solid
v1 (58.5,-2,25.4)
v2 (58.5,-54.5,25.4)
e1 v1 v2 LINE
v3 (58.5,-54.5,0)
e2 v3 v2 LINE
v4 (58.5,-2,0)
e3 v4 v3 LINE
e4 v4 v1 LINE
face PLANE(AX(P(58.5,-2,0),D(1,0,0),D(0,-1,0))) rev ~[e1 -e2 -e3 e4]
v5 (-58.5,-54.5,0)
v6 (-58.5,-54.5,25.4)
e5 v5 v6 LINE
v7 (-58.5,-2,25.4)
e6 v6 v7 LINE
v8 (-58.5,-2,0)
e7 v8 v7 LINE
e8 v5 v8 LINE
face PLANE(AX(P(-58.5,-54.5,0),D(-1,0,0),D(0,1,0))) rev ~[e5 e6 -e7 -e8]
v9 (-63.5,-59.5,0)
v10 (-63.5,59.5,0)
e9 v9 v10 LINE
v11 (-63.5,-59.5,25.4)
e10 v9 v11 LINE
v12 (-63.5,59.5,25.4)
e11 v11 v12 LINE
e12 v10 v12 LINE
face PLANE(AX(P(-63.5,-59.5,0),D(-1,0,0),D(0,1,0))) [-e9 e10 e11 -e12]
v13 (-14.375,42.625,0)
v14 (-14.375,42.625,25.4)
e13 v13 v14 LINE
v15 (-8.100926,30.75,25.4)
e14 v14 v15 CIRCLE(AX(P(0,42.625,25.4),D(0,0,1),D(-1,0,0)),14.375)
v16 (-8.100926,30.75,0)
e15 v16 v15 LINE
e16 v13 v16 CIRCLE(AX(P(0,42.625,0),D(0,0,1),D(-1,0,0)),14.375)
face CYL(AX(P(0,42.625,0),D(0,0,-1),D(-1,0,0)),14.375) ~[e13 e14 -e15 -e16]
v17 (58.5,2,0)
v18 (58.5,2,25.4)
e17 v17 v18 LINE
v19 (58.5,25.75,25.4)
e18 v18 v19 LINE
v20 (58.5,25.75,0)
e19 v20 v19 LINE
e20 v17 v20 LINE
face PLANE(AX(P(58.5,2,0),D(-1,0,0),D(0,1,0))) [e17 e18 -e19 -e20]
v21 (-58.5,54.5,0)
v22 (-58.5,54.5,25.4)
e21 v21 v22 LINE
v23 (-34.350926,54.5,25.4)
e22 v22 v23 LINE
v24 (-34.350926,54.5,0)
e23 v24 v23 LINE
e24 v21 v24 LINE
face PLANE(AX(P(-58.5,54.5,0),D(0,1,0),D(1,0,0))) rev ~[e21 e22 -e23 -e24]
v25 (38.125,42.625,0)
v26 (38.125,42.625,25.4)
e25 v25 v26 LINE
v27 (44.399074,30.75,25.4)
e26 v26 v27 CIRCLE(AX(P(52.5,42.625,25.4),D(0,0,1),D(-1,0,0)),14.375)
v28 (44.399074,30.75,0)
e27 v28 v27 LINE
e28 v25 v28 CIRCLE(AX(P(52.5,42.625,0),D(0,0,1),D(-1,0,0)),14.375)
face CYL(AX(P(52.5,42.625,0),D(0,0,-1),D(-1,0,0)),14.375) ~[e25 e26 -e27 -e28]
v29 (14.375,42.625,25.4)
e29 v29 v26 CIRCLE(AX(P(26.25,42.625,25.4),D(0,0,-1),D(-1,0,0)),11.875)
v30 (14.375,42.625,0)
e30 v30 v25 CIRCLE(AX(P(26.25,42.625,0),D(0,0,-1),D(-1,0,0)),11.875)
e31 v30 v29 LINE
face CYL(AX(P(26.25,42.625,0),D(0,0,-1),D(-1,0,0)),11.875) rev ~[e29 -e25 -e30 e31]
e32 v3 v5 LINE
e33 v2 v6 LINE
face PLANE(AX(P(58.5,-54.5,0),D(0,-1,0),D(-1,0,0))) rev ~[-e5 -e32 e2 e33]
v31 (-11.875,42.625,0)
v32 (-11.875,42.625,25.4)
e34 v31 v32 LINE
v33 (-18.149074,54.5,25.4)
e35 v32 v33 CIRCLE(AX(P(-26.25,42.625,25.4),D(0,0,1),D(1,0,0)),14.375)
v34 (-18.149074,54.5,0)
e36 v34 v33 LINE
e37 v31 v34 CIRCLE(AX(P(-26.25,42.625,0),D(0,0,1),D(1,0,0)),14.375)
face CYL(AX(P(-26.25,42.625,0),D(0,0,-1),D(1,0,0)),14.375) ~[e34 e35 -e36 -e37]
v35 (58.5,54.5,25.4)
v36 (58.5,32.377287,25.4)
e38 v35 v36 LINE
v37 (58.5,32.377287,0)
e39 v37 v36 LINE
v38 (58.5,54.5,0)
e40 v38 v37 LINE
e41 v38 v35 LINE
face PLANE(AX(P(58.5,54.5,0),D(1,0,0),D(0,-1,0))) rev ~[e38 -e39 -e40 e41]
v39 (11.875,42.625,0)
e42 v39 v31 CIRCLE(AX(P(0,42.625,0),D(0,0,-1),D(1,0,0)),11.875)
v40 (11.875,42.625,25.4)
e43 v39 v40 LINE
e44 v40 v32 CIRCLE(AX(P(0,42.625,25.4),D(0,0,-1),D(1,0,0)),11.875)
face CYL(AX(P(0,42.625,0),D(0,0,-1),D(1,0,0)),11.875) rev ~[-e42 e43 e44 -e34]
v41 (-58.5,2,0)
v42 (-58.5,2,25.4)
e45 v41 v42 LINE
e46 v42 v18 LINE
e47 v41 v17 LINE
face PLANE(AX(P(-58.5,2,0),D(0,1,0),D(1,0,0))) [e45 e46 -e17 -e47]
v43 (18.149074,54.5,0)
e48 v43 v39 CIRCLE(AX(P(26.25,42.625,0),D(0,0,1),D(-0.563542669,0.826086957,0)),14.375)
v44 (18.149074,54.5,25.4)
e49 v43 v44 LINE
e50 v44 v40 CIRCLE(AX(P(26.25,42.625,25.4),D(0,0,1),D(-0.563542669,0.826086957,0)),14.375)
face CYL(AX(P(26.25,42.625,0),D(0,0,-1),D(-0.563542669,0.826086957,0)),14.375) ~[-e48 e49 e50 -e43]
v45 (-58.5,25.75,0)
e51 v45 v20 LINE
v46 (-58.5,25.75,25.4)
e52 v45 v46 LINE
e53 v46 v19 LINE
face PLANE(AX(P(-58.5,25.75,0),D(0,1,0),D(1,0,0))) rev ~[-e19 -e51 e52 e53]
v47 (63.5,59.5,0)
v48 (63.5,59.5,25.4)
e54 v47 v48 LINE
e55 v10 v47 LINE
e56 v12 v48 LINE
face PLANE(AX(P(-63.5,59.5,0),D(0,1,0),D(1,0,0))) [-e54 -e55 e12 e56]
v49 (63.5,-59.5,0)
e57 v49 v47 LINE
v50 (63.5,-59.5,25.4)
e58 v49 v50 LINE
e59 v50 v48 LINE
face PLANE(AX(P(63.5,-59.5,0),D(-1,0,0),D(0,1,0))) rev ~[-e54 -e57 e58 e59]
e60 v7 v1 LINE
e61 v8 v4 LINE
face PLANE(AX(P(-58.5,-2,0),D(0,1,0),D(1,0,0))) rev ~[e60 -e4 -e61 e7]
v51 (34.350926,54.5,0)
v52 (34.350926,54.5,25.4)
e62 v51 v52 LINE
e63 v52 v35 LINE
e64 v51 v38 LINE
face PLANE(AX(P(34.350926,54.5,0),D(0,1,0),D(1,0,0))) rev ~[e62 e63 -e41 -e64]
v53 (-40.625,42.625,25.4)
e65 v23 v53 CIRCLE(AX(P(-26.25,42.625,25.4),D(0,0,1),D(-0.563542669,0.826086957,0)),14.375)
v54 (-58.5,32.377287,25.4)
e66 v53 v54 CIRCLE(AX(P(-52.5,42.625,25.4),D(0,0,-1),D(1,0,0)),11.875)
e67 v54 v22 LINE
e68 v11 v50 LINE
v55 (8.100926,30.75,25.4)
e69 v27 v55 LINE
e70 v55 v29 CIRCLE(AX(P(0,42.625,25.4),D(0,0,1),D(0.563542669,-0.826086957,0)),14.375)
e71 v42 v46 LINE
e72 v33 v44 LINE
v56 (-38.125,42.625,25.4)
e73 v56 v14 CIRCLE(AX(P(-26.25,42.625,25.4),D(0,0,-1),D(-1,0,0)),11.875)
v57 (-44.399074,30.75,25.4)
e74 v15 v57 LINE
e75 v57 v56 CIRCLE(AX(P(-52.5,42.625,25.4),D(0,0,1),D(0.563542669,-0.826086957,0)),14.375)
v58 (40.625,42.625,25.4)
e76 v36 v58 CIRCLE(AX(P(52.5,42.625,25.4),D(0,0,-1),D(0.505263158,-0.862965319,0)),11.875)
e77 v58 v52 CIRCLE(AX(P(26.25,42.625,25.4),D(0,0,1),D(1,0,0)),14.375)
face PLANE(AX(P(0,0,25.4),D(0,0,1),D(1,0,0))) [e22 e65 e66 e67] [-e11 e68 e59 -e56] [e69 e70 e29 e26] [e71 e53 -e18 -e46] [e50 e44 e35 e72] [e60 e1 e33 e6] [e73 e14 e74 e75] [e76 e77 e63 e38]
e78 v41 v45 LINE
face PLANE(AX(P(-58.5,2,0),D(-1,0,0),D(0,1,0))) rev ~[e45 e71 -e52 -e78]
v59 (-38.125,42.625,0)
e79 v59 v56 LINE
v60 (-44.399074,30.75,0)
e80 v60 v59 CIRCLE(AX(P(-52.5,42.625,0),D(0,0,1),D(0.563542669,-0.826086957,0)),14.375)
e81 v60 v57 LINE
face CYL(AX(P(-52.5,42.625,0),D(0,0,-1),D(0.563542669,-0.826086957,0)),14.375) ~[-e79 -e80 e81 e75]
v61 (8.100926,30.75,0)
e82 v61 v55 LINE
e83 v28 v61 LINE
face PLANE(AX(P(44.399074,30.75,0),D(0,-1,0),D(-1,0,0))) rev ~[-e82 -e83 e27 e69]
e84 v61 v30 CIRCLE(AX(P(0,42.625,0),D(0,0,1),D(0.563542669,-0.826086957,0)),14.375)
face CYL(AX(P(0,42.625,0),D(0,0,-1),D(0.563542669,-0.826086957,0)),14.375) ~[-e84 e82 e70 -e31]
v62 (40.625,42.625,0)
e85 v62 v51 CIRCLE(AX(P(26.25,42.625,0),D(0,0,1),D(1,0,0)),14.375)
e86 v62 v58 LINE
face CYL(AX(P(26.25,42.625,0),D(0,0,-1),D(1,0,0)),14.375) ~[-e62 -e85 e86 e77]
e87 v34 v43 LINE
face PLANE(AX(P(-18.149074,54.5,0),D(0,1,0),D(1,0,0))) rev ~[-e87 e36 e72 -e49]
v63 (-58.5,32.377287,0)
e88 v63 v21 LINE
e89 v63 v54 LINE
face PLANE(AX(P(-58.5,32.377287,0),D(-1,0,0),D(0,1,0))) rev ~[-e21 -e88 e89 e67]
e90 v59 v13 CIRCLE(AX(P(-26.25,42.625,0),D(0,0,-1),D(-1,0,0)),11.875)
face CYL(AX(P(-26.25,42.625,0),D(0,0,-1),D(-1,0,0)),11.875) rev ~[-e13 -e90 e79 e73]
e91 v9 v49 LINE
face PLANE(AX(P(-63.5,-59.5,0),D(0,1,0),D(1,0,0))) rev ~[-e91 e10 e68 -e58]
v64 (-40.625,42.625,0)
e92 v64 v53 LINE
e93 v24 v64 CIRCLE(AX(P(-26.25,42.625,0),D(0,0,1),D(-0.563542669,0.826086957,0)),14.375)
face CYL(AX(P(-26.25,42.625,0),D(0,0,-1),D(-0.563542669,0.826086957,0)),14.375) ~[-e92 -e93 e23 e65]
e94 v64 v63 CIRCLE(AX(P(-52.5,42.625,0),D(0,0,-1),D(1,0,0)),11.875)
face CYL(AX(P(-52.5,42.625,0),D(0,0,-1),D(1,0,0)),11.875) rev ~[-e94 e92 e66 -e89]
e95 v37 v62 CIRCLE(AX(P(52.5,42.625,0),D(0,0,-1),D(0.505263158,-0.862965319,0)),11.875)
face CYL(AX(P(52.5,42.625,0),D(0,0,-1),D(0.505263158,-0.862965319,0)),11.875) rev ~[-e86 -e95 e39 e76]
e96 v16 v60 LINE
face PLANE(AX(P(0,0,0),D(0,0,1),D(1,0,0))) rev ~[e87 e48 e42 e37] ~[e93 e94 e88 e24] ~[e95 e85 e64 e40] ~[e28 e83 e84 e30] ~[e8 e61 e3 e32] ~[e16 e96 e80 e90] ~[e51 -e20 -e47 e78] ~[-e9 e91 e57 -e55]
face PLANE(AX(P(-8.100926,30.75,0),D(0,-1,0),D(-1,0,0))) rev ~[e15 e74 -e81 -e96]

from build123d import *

# Parameters (mm, degrees)
F0_W     = 127
F0_H     = 119
F0_W_2   = 117
F0_H_2   = 23.75
F1_DEPTH = 25.4


# Not quite as in the source:
# - a feature of the source that left no trace in its solid (it failed there, or was rolled back) is left out


with BuildPart() as f1:
    # F0 (on Top) → F1 (new body)
    with BuildSketch(Plane.XY):
        Rectangle(F0_W, F0_H)
        Polygon((58.5, -54.5), (-58.5, -54.5), (-58.5, -30.75), (-58.5, -28.25), (-58.5, -25.75), (-58.5, -2), (58.5, -2), (58.5, -25.75), (58.5, -28.25), (58.5, -30.75), align=None, mode=Mode.SUBTRACT)
        with BuildLine():
            Line((-58.5, 32.3772868405), (-58.5, 54.5))
            Line((-58.5, 54.5), (-44.399074127, 54.5))
            Line((-44.399074127, 54.5), (-34.350925873, 54.5))
            ThreePointArc((-34.350925873, 54.5), (-38.9600636195, 49.3402742154), (-40.625, 42.625))
            ThreePointArc((-40.625, 42.625), (-46.5938326725, 32.3229219329), (-58.5, 32.3772868405))
        make_face(mode=Mode.SUBTRACT)
        with BuildLine():
            Line((-18.149074127, 30.75), (-44.399074127, 30.75))
            ThreePointArc((-44.399074127, 30.75), (-39.7899363805, 35.9097257846), (-38.125, 42.625))
            ThreePointArc((-38.125, 42.625), (-26.25, 54.5), (-14.375, 42.625))
            ThreePointArc((-14.375, 42.625), (-12.7100636195, 35.9097257846), (-8.100925873, 30.75))
            Line((-8.100925873, 30.75), (-18.149074127, 30.75))
        make_face(mode=Mode.SUBTRACT)
        with Locations((0, 13.875)):
            Rectangle(F0_W_2, F0_H_2, mode=Mode.SUBTRACT)
        with BuildLine():
            ThreePointArc((11.875, 42.625), (0, 30.75), (-11.875, 42.625))
            ThreePointArc((-11.875, 42.625), (-13.5399363805, 49.3402742154), (-18.149074127, 54.5))
            Line((-18.149074127, 54.5), (18.149074127, 54.5))
            ThreePointArc((18.149074127, 54.5), (13.5399363805, 49.3402742154), (11.875, 42.625))
        make_face(mode=Mode.SUBTRACT)
        with BuildLine():
            ThreePointArc((14.375, 42.625), (26.25, 54.5), (38.125, 42.625))
            ThreePointArc((38.125, 42.625), (39.7899363805, 35.9097257846), (44.399074127, 30.75))
            Line((44.399074127, 30.75), (8.100925873, 30.75))
            ThreePointArc((8.100925873, 30.75), (12.7100636195, 35.9097257846), (14.375, 42.625))
        make_face(mode=Mode.SUBTRACT)
        with BuildLine():
            Line((34.350925873, 54.5), (58.5, 54.5))
            Line((58.5, 54.5), (58.5, 32.3772868405))
            ThreePointArc((58.5, 32.3772868405), (46.5938326725, 32.3229219329), (40.625, 42.625))
            ThreePointArc((40.625, 42.625), (38.9600636195, 49.3402742154), (34.350925873, 54.5))
        make_face(mode=Mode.SUBTRACT)
    extrude(amount=F1_DEPTH)


solid = f1.part
